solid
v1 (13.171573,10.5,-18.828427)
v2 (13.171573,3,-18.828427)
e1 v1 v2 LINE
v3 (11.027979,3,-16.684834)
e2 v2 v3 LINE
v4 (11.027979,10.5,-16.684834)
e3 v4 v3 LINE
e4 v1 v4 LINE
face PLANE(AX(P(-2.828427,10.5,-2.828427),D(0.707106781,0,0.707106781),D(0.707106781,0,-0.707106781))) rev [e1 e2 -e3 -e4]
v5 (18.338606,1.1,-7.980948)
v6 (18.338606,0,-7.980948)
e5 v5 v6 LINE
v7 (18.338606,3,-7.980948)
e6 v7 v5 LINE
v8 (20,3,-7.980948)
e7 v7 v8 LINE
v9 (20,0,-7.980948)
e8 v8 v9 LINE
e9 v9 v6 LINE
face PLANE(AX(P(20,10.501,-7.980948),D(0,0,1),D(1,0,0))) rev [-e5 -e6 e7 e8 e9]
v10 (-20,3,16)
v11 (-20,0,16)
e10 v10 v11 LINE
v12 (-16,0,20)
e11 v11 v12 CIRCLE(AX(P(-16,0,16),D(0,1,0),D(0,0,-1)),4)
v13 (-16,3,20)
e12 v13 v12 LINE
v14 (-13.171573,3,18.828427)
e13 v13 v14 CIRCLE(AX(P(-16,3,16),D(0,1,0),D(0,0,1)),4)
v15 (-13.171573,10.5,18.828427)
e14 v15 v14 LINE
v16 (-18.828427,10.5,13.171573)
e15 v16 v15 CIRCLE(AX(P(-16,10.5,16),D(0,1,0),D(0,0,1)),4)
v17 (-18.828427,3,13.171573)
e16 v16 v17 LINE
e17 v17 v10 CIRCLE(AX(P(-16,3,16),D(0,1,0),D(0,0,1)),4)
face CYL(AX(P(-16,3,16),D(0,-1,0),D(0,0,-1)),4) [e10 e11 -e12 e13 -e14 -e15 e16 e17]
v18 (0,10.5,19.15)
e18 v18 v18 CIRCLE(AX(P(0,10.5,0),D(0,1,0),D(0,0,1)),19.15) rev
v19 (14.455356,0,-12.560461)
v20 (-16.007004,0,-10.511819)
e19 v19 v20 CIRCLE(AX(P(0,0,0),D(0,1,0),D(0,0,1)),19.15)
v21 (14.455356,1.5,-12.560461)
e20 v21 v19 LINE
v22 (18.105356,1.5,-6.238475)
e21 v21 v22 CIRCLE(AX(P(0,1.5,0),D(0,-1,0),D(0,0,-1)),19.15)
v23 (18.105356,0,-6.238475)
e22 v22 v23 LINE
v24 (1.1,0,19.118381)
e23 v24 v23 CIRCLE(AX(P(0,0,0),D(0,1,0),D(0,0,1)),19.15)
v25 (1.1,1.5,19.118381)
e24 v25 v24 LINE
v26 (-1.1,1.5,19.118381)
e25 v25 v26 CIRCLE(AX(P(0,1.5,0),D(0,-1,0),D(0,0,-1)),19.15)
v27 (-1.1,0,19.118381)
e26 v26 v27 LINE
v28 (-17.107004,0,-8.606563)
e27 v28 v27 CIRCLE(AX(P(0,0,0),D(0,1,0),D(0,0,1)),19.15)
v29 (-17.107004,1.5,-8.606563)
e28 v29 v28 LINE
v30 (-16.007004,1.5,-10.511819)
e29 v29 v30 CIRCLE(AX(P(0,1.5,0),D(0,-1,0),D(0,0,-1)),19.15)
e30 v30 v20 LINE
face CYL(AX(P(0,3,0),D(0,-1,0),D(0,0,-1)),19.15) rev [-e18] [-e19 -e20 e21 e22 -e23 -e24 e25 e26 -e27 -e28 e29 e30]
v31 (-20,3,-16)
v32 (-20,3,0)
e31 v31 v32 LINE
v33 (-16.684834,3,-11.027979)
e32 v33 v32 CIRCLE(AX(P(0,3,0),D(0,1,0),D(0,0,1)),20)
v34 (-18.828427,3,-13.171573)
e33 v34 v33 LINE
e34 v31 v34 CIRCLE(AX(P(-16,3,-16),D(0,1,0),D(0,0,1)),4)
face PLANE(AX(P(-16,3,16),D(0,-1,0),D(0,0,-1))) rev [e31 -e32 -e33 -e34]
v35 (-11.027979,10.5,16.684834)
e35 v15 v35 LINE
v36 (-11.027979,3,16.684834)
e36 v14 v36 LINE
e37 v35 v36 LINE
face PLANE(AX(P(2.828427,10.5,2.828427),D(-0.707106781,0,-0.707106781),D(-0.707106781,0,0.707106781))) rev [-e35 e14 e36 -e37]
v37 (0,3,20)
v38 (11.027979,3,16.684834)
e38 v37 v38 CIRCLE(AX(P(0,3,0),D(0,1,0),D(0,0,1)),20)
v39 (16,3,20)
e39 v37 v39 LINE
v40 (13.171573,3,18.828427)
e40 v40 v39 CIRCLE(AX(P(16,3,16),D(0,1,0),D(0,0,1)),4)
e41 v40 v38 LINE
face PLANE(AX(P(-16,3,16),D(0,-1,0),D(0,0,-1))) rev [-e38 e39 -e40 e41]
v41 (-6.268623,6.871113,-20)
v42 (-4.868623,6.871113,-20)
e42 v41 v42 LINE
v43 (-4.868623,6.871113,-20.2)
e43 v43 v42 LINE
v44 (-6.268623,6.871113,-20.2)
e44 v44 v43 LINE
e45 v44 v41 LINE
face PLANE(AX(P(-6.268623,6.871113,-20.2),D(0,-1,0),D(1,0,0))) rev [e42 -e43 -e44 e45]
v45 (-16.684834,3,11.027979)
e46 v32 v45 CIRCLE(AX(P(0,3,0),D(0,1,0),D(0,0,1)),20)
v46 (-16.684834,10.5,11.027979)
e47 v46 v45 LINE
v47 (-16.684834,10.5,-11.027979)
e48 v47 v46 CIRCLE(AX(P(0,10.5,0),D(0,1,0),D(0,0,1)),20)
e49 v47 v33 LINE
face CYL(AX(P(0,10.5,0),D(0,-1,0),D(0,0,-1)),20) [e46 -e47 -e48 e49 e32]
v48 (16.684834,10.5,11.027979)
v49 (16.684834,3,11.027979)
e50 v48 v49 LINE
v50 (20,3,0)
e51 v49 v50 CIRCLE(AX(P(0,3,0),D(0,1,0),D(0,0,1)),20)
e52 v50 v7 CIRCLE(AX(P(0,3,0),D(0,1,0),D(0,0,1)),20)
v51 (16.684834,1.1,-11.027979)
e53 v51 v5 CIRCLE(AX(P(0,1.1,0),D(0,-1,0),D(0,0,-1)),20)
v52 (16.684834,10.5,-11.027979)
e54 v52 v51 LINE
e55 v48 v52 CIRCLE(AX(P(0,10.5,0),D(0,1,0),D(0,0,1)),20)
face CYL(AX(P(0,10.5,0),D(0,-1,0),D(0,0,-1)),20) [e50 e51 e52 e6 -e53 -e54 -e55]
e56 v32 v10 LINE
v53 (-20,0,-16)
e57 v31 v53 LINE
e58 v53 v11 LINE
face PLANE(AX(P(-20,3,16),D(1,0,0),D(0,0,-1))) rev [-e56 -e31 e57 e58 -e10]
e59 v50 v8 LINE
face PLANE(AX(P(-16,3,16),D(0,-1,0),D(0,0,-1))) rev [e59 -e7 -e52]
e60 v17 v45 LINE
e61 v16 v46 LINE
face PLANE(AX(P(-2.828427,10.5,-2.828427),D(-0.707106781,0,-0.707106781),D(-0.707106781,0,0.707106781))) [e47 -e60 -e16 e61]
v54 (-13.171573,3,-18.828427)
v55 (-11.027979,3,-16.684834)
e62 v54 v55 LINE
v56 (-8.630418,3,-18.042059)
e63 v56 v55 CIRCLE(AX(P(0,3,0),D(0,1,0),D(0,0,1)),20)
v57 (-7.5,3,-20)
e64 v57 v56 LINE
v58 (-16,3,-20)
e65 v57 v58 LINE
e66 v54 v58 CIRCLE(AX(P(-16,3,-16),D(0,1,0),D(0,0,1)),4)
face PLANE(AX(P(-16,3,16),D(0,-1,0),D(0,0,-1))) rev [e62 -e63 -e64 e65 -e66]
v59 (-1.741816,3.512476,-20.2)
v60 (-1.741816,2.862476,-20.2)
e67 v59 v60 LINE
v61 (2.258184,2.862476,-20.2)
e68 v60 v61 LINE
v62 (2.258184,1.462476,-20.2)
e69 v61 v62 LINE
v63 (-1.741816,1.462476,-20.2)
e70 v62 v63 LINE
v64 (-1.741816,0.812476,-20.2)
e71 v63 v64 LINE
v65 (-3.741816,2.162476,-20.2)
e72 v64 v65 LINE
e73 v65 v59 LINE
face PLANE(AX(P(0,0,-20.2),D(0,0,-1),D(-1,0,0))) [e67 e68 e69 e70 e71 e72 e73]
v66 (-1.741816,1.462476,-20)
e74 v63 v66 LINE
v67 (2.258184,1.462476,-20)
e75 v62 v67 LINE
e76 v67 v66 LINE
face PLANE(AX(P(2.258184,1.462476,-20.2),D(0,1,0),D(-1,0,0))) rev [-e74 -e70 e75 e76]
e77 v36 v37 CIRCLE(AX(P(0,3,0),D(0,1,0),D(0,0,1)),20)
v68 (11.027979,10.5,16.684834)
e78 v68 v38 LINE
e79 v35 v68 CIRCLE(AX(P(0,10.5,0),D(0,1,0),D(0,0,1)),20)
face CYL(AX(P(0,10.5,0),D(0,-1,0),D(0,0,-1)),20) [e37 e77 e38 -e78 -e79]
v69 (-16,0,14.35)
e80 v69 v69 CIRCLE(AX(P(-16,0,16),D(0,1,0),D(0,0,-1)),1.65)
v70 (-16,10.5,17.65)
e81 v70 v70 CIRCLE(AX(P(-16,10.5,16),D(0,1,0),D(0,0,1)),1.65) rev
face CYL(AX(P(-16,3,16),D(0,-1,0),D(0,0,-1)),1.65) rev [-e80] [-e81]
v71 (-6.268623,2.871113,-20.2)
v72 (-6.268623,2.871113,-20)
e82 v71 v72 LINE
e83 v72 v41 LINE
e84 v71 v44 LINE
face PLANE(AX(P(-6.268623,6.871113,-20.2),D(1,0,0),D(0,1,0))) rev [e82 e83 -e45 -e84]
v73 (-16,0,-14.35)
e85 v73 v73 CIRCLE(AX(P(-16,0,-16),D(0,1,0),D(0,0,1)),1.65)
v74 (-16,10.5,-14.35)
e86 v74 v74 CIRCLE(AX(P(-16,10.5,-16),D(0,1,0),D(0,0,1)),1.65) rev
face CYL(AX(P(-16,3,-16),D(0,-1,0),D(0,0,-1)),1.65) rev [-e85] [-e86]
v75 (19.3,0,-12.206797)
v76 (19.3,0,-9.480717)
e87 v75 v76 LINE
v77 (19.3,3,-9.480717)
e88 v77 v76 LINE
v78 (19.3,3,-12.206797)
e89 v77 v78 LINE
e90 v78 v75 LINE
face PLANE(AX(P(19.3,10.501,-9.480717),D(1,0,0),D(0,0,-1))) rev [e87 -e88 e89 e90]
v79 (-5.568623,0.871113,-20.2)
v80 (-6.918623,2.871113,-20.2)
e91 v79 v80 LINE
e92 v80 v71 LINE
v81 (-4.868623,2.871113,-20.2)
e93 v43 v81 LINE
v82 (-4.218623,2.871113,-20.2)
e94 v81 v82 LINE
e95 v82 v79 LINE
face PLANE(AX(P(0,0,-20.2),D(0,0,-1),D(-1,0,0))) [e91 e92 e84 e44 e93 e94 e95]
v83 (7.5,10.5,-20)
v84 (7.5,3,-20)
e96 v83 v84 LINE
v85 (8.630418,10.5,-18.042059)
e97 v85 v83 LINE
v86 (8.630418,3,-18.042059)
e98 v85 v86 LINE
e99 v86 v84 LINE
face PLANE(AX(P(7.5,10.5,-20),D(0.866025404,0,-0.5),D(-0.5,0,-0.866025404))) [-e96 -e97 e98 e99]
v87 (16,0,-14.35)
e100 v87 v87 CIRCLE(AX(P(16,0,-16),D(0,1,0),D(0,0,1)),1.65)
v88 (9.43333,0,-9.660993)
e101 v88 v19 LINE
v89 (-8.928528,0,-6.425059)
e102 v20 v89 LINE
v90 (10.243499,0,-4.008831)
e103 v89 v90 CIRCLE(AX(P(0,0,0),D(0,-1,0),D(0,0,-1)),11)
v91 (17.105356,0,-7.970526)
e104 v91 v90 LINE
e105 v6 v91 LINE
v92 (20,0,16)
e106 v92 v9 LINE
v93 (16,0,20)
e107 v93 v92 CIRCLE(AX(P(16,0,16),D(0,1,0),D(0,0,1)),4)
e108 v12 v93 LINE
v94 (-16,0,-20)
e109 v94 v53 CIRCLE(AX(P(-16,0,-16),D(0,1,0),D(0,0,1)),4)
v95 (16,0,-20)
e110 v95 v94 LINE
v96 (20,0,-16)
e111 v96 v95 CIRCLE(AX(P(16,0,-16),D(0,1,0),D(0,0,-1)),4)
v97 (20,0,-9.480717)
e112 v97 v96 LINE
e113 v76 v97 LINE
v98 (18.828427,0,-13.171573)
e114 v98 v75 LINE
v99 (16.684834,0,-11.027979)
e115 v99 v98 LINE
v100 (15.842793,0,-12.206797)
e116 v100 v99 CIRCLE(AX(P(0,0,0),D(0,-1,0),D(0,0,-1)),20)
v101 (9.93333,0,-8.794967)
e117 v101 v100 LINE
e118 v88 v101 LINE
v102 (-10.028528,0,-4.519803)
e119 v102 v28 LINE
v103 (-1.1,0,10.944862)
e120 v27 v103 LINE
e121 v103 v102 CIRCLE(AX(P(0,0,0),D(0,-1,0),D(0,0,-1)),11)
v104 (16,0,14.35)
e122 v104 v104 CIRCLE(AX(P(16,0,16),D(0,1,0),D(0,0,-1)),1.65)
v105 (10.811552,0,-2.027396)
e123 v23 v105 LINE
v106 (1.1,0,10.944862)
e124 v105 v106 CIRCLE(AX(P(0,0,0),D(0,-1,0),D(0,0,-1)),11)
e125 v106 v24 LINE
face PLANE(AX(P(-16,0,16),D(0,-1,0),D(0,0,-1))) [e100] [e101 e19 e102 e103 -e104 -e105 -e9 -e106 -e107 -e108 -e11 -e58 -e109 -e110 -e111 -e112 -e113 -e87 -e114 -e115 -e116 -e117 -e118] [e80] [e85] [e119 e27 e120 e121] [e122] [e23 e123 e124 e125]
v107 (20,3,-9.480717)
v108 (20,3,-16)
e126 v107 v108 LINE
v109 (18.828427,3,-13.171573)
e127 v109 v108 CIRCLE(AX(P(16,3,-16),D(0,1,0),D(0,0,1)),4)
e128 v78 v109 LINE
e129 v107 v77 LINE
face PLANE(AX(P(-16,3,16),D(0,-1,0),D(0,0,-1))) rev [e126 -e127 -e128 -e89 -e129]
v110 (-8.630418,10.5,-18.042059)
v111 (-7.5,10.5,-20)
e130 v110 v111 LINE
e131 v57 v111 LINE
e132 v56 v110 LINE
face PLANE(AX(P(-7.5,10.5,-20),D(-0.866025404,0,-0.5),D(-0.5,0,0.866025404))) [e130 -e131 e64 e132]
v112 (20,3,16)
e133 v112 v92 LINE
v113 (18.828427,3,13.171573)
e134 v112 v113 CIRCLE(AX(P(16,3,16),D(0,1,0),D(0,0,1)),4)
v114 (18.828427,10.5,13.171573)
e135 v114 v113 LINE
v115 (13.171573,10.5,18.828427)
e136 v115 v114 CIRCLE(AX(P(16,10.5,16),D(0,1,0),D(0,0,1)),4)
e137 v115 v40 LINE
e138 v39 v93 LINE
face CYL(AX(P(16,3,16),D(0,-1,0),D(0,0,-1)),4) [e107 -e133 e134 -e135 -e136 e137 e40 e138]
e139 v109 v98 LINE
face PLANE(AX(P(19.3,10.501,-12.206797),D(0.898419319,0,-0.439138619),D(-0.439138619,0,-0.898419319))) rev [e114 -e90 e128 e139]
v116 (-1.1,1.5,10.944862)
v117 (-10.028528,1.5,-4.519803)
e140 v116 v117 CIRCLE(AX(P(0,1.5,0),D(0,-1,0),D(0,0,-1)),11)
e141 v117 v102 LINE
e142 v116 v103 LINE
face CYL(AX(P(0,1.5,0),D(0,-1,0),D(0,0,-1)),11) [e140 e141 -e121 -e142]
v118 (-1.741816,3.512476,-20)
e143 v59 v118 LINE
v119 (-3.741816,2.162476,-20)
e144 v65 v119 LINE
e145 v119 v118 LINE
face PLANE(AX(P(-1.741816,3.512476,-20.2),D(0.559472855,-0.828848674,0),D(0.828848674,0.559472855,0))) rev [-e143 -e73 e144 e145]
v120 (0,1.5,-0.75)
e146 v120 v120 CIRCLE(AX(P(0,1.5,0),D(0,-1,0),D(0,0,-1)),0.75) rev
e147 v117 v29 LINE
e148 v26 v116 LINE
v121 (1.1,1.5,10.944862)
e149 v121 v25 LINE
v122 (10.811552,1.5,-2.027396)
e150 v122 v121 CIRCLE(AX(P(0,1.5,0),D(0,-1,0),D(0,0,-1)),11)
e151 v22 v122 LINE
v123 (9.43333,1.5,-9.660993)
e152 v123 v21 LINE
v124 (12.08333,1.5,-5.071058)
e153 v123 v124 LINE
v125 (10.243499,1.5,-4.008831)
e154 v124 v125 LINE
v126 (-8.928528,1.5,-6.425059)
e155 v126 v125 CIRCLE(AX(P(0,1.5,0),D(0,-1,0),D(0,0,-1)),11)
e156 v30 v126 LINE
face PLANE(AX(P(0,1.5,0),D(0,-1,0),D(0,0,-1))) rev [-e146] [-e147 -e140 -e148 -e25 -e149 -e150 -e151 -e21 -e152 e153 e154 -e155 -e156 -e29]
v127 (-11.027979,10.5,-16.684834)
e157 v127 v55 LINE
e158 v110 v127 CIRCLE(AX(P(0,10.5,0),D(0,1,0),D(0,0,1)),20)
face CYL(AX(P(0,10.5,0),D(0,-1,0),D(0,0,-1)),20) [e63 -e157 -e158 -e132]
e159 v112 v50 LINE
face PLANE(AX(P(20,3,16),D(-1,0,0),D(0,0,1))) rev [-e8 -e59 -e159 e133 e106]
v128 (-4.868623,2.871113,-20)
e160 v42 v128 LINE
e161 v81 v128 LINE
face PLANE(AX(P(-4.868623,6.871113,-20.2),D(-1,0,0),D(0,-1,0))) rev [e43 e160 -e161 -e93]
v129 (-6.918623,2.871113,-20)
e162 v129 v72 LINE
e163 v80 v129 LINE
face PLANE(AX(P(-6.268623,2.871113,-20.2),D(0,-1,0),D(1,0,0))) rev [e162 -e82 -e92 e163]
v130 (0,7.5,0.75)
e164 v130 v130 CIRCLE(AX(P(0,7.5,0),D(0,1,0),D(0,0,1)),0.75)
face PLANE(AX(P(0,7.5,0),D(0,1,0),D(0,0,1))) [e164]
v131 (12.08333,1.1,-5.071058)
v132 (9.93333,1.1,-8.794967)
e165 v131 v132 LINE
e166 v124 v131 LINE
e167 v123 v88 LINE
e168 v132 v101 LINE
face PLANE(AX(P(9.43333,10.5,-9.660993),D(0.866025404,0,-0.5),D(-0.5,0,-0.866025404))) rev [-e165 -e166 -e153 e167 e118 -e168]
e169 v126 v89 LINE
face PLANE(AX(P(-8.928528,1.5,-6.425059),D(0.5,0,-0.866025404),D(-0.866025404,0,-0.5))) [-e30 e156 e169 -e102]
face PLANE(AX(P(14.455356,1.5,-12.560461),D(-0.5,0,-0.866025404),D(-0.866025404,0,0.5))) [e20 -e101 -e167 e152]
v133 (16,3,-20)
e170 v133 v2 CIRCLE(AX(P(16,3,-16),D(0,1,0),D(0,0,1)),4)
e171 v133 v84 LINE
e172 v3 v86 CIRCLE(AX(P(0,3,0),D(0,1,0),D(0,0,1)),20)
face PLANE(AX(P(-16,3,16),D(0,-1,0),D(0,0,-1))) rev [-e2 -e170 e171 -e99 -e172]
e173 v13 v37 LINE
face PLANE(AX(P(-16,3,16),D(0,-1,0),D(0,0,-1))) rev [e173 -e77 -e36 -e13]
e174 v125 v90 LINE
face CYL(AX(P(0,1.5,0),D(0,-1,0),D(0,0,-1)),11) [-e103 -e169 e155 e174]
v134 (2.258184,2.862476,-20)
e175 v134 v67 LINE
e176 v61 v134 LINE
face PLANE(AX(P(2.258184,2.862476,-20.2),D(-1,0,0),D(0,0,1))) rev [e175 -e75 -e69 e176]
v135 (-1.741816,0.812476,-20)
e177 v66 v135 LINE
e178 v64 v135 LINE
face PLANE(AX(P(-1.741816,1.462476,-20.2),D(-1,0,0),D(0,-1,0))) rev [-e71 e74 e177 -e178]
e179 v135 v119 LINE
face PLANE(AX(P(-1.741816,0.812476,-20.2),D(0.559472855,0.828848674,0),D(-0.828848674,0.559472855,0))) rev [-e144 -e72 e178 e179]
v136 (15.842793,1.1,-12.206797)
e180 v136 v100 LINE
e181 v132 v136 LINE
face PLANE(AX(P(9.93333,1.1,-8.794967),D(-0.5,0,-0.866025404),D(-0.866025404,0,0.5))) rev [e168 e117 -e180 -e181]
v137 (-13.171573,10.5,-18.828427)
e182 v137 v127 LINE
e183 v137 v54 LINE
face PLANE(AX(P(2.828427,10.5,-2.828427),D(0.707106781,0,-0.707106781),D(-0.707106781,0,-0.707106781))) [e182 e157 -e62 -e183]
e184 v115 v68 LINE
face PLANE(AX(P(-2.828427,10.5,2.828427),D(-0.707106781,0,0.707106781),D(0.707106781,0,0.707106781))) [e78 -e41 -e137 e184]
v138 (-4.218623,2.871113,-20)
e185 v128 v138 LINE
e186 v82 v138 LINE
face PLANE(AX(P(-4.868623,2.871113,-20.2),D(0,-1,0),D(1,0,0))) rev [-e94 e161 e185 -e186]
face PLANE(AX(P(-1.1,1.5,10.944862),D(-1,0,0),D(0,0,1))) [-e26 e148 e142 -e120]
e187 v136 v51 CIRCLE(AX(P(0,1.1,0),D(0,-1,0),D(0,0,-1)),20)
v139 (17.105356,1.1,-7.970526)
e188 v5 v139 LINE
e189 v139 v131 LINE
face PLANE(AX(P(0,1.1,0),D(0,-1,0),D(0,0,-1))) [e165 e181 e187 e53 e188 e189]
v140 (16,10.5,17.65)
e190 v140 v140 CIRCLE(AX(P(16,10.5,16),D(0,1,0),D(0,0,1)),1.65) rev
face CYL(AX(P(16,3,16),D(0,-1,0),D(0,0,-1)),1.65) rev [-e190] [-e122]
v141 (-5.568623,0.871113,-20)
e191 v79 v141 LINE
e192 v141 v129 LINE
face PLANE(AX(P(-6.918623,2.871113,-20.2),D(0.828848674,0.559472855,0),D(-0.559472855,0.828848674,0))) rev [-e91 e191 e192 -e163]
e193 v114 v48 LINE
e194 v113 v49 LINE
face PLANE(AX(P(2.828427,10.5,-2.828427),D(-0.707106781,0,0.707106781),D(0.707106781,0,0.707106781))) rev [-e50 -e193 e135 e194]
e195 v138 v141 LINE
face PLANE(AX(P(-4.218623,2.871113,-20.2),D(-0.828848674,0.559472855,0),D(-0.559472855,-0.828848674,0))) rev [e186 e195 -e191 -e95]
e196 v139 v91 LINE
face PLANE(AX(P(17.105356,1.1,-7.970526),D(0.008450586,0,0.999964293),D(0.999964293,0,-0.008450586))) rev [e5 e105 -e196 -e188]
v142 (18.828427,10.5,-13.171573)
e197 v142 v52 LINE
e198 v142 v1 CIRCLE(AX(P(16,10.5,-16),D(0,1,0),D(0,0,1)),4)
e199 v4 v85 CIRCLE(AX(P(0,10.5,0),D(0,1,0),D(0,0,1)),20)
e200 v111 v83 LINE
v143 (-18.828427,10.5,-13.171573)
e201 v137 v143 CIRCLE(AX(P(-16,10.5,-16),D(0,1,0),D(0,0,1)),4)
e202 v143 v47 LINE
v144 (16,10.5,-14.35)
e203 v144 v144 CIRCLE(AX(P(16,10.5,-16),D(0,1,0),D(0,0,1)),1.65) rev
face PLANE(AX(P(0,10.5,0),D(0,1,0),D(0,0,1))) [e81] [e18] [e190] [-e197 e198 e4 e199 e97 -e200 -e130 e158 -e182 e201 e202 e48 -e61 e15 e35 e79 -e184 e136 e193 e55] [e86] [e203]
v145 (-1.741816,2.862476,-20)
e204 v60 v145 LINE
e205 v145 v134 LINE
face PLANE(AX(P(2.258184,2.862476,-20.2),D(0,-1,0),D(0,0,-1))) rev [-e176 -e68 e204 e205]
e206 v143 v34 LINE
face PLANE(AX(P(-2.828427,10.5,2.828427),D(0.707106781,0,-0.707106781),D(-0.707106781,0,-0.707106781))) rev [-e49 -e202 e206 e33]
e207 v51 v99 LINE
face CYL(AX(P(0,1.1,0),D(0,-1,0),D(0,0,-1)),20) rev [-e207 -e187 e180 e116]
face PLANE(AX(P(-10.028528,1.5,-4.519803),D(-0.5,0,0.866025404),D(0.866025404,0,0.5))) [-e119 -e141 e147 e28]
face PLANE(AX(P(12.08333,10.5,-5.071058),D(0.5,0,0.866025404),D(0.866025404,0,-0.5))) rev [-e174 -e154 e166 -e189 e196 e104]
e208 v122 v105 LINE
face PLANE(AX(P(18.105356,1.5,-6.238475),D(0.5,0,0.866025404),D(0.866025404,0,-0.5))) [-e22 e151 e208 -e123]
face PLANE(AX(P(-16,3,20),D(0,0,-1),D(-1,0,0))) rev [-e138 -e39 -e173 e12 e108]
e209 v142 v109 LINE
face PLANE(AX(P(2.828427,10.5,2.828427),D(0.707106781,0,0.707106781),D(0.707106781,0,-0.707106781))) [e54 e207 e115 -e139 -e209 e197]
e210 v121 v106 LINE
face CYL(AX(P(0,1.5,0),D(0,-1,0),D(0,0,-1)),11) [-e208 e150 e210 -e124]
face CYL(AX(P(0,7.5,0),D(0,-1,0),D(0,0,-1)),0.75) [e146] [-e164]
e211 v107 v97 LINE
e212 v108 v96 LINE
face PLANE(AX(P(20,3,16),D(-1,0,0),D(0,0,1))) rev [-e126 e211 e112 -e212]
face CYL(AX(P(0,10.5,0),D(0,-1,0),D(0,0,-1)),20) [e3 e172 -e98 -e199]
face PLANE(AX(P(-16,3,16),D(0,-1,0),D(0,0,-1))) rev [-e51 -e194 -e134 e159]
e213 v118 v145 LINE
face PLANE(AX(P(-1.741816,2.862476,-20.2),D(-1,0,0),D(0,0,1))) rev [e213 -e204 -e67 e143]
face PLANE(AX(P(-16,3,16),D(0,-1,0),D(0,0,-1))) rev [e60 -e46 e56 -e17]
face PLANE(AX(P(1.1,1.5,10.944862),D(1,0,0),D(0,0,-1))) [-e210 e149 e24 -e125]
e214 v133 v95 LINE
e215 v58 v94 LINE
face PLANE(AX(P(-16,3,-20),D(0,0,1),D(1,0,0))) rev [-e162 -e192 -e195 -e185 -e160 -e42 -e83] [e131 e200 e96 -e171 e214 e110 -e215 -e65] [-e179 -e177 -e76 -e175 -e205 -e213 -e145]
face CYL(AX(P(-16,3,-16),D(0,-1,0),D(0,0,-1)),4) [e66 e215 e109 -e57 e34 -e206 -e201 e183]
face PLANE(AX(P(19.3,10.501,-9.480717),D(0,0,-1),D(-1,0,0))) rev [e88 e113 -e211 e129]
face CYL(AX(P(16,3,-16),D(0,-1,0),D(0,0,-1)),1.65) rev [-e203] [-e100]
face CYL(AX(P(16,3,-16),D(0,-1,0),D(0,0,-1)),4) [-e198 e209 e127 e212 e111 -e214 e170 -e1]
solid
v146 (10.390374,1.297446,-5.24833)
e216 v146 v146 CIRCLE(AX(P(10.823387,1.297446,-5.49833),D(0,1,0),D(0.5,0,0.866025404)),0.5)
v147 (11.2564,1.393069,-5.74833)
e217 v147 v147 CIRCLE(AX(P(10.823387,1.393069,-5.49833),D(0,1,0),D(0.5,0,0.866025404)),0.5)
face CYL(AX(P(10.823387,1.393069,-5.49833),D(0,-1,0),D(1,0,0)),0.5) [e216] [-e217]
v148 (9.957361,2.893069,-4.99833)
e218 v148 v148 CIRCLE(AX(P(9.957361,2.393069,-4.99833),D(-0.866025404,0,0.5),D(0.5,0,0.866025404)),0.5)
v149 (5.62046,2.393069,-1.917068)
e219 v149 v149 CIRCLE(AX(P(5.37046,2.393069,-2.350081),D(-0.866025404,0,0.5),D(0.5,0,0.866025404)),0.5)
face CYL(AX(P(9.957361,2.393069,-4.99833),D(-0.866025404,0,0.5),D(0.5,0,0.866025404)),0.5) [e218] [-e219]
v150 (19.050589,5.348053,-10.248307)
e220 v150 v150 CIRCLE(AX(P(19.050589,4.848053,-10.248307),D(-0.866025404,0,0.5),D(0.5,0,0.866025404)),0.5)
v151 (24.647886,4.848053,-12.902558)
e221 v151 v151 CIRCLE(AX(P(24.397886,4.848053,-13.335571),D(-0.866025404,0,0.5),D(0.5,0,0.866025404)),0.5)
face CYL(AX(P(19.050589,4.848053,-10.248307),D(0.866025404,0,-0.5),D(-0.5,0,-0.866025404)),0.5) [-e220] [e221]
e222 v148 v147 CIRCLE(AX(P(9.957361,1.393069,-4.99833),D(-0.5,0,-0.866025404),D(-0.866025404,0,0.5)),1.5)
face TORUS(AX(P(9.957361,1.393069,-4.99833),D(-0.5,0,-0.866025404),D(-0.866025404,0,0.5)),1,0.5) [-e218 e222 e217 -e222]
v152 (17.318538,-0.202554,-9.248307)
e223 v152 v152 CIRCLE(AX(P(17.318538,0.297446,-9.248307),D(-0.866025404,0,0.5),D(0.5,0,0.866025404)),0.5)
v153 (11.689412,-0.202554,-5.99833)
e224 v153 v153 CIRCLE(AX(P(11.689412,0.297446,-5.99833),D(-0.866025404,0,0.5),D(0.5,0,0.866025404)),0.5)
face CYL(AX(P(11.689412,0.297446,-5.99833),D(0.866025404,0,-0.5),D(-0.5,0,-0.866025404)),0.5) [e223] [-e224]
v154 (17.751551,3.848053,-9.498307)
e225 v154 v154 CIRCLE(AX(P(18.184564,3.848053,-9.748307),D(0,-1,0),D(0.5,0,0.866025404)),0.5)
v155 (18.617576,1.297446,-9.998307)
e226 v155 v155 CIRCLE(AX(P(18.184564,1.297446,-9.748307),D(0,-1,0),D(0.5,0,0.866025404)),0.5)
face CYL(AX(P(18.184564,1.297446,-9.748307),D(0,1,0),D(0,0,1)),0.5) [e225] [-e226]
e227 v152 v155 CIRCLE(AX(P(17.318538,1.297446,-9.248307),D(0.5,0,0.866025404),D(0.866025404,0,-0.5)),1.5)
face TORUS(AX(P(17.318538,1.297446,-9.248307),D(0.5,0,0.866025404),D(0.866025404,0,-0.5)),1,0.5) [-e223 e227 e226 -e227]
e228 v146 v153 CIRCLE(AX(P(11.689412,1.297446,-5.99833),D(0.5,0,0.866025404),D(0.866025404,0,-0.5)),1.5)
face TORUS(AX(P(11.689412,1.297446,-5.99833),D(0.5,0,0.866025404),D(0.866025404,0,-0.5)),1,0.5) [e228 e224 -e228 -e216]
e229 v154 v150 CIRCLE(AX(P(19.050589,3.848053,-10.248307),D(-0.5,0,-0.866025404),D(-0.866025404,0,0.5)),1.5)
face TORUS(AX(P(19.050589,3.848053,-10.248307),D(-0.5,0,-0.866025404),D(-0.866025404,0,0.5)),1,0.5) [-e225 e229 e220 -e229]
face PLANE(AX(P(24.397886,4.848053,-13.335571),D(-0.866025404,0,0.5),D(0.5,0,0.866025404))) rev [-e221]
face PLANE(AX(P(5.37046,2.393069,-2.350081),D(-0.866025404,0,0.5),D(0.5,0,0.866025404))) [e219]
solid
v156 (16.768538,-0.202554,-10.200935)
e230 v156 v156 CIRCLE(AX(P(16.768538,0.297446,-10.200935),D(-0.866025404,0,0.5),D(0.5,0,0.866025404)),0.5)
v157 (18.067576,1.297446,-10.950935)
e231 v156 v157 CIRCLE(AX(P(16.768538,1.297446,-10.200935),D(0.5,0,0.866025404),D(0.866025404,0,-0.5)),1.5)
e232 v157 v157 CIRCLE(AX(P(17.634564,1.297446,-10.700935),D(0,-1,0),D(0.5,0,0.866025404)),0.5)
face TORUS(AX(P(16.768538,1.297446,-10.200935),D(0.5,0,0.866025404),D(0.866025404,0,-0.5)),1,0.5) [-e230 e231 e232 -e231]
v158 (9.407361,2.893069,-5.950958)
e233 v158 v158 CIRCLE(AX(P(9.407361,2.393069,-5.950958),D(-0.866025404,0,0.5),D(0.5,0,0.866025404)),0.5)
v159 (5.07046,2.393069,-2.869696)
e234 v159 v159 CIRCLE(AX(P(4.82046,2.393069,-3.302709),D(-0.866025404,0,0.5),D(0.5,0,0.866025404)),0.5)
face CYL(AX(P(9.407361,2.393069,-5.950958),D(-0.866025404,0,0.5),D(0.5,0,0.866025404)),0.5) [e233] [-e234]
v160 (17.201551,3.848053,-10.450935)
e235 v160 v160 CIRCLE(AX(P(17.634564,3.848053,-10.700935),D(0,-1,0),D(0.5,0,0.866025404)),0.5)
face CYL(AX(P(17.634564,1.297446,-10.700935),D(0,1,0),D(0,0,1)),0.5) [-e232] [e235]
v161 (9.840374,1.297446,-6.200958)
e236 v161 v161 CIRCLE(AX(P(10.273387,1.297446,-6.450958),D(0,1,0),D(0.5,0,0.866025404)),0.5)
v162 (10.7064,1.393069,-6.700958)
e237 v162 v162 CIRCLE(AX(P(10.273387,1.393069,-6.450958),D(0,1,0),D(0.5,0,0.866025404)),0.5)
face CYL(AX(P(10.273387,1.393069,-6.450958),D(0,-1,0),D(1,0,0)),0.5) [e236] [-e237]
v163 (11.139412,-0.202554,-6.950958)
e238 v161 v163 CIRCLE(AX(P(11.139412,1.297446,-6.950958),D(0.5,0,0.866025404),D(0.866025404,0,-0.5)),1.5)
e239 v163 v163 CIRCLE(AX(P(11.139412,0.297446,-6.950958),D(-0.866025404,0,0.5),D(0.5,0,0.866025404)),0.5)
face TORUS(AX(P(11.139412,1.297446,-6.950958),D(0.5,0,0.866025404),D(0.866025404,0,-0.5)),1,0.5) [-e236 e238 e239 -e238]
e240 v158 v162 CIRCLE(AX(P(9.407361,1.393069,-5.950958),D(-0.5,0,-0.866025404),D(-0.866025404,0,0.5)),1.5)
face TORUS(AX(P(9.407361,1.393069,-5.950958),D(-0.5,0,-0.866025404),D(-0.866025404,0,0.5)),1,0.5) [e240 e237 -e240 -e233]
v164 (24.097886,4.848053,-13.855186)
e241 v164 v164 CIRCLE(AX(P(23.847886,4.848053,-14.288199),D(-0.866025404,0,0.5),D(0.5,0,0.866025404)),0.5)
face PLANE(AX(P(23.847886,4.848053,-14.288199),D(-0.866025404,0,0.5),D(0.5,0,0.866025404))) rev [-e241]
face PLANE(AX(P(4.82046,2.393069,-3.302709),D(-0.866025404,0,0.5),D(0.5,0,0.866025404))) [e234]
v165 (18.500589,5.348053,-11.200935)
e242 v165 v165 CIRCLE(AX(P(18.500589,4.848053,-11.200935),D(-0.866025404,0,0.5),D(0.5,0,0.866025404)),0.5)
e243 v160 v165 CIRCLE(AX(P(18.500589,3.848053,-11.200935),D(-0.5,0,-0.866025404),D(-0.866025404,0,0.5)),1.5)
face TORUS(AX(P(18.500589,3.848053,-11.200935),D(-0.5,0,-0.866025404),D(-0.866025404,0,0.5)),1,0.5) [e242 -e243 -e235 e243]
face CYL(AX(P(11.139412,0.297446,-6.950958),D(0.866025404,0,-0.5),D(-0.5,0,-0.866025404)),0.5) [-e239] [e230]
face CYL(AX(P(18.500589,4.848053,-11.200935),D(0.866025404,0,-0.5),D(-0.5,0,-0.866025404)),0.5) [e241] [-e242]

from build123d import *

# Parameters (mm, degrees)
SKETCH1_R           = 1.65
SKETCH1_R_2         = 19.15
BOSS_EXTRUDE1_DEPTH = 3
SKETCH2_R           = 1.65
SKETCH2_R_2         = 19.15
BOSS_EXTRUDE2_DEPTH = 7.5
BOSS_EXTRUDE3_DEPTH = 1.5
CUT_EXTRUDE1_DEPTH  = 31.170349683
CUT_EXTRUDE2_DEPTH  = 1.1
CUT_EXTRUDE3_REACH  = 32.17
SKETCH7_R           = 0.75
BOSS_EXTRUDE4_DEPTH = 6
BOSS_EXTRUDE5_START = 3
BOSS_EXTRUDE5_DEPTH = 7.5
DRAFT1_ANGLE        = 30
BOSS_EXTRUDE6_DEPTH = 0.2
SKETCH13_R          = 0.5


# Read off the part's stored shape, not the designer's step: Boss-Extrude5
with BuildPart() as part:
    # Sketch1 → Boss-Extrude1 (new body)
    with BuildSketch(Plane(origin=(0, 0, 0), x_dir=(1, 0, 0), z_dir=(0, 1, 0))):
        with BuildLine():
            Line((-16, -20), (16, -20))
            ThreePointArc((16, -20), (18.828427125, -18.828427125), (20, -16))
            Line((20, -16), (20, 16))
            ThreePointArc((20, 16), (18.828427125, 18.828427125), (16, 20))
            Line((16, 20), (-16, 20))
            ThreePointArc((-16, 20), (-18.828427125, 18.828427125), (-20, 16))
            Line((-20, 16), (-20, -16))
            ThreePointArc((-20, -16), (-18.828427125, -18.828427125), (-16, -20))
        make_face()
        with Locations(Location((-16, 16, 0), (0, 0, 270))):
            Circle(SKETCH1_R, mode=Mode.SUBTRACT)
        with Locations(Location((16, 16, 0), (0, 0, 270))):
            Circle(SKETCH1_R, mode=Mode.SUBTRACT)
        with Locations(Location((-16, -16, 0), (0, 0, 90))):
            Circle(SKETCH1_R, mode=Mode.SUBTRACT)
        with Locations(Location((16, -16, 0), (0, 0, 90))):
            Circle(SKETCH1_R, mode=Mode.SUBTRACT)
        with Locations(Location((0, 0, 0), (0, 0, 270))):
            Circle(SKETCH1_R_2, mode=Mode.SUBTRACT)
    extrude(amount=BOSS_EXTRUDE1_DEPTH)

    # Sketch2 → Boss-Extrude2 (add)
    with BuildSketch(Plane(origin=(0, 3, 0), x_dir=(1, 0, 0), z_dir=(0, 1, 0))):
        with BuildLine():
            Line((-13.171572875, -18.828427125), (-11.027979336, -16.684833585))
            ThreePointArc((-11.027979336, -16.684833585), (0, -20), (11.027979336, -16.684833585))
            Line((11.027979336, -16.684833585), (13.171572875, -18.828427125))
            ThreePointArc((13.171572875, -18.828427125), (18.828427125, -18.828427125), (18.828427125, -13.171572875))
            Line((18.828427125, -13.171572875), (16.684833585, -11.027979336))
            ThreePointArc((16.684833585, -11.027979336), (20, 0), (16.684833585, 11.027979336))
            Line((16.684833585, 11.027979336), (18.828427125, 13.171572875))
            ThreePointArc((18.828427125, 13.171572875), (18.828427125, 18.828427125), (13.171572875, 18.828427125))
            Line((13.171572875, 18.828427125), (11.027979336, 16.684833585))
            ThreePointArc((11.027979336, 16.684833585), (0, 20), (-11.027979336, 16.684833585))
            Line((-11.027979336, 16.684833585), (-13.171572875, 18.828427125))
            ThreePointArc((-13.171572875, 18.828427125), (-18.828427125, 18.828427125), (-18.828427125, 13.171572875))
            Line((-18.828427125, 13.171572875), (-16.684833585, 11.027979336))
            ThreePointArc((-16.684833585, 11.027979336), (-20, 0), (-16.684833585, -11.027979336))
            Line((-16.684833585, -11.027979336), (-18.828427125, -13.171572875))
            ThreePointArc((-18.828427125, -13.171572875), (-18.828427125, -18.828427125), (-13.171572875, -18.828427125))
        make_face()
        with Locations(Location((-16, -16, 0), (0, 0, 90))):
            Circle(SKETCH2_R, mode=Mode.SUBTRACT)
        with Locations(Location((0, 0, 0), (0, 0, 270))):
            Circle(SKETCH2_R_2, mode=Mode.SUBTRACT)
        with Locations(Location((16, -16, 0), (0, 0, 90))):
            Circle(SKETCH2_R, mode=Mode.SUBTRACT)
        with Locations(Location((-16, 16, 0), (0, 0, 270))):
            Circle(SKETCH2_R, mode=Mode.SUBTRACT)
        with Locations(Location((16, 16, 0), (0, 0, 270))):
            Circle(SKETCH2_R, mode=Mode.SUBTRACT)
    extrude(amount=BOSS_EXTRUDE2_DEPTH)

    # Sketch3 → Boss-Extrude3 (add)
    with BuildSketch(Plane.XZ):
        with BuildLine():
            Line((1.1, 10.944861808), (1.1, 19.118381208))
            ThreePointArc((1.1, 19.118381208), (0, 19.15), (-1.1, 19.118381208))
            Line((-1.1, 19.118381208), (-1.1, 10.944861808))
            ThreePointArc((-1.1, 10.944861808), (-9.526279442, 5.5), (-10.028528367, -4.51980296))
            Line((-10.028528367, -4.51980296), (-17.107003805, -8.60656266))
            ThreePointArc((-17.107003805, -8.60656266), (-16.584386482, -9.575), (-16.007003805, -10.511818548))
            Line((-16.007003805, -10.511818548), (-8.928528367, -6.425058848))
            ThreePointArc((-8.928528367, -6.425058848), (-1.306256139, -10.922165303), (7.161552454, -8.349381202))
            Line((7.161552454, -8.349381202), (14.455356261, -12.560460794))
            ThreePointArc((14.455356261, -12.560460794), (16.584386482, -9.575), (18.105356261, -6.238475346))
            Line((18.105356261, -6.238475346), (10.811552454, -2.027395754))
            ThreePointArc((10.811552454, -2.027395754), (8.805744547, 6.592333651), (1.1, 10.944861808))
        make_face()
    extrude(amount=-BOSS_EXTRUDE3_DEPTH)

    # Sketch4 → Cut-Extrude1 (cut, through all)
    with BuildSketch(Plane.XZ):
        with BuildLine():
            Line((7.161552454, -8.349381202), (9.433330249, -9.660992724))
            Line((9.433330249, -9.660992724), (12.083330249, -5.071058084))
            Line((12.083330249, -5.071058084), (10.243499084, -4.008831065))
            ThreePointArc((10.243499084, -4.008831065), (8.969060633, -6.368355468), (7.161552454, -8.349381202))
        make_face()
    extrude(amount=-CUT_EXTRUDE1_DEPTH, mode=Mode.SUBTRACT)

    # Sketch5 → Cut-Extrude2 (cut)
    with BuildSketch(Plane.XZ):
        with BuildLine():
            Line((9.933330249, -8.79496732), (12.083330249, -5.071058084))
            Line((12.083330249, -5.071058084), (17.105356261, -7.970526154))
            Line((17.105356261, -7.970526154), (18.338605882, -7.980948208))
            ThreePointArc((18.338605882, -7.980948208), (17.220814787, -10.170719645), (15.842793248, -12.206797373))
            Line((15.842793248, -12.206797373), (9.933330249, -8.79496732))
        make_face()
    extrude(amount=-CUT_EXTRUDE2_DEPTH, mode=Mode.SUBTRACT)

    # Sketch6 → Cut-Extrude3 (cut, up to next)
    with BuildSketch(Plane.XZ, mode=Mode.PRIVATE) as cut_extrude3_sk1:
        with BuildLine():
            Line((18.828427125, -13.171572875), (16.684833585, -11.027979336))
            ThreePointArc((16.684833585, -11.027979336), (17.577867553, -9.540365417), (18.338605882, -7.980948208))
            Line((18.338605882, -7.980948208), (20, -7.980948208))
            Line((20, -7.980948208), (20, -9.480717324))
            Line((20, -9.480717324), (19.3, -9.480717324))
            Line((19.3, -9.480717324), (19.3, -12.206797373))
            Line((19.3, -12.206797373), (18.828427125, -13.171572875))
        make_face()
    cut_extrude3_tool1 = extrude(cut_extrude3_sk1.sketch, amount=-CUT_EXTRUDE3_REACH, mode=Mode.PRIVATE) & part.part
    add(cut_extrude3_tool1.solids().sort_by_distance((18.505479, 0, -10.298583))[0], mode=Mode.SUBTRACT)

    # Sketch7 → Boss-Extrude4 (add)
    with BuildSketch(Plane(origin=(0, 1.5, 0), x_dir=(1, 0, 0), z_dir=(0, 1, 0))):
        with Locations(Location((0, 0, 0), (0, 0, 90))):
            Circle(SKETCH7_R)
    extrude(amount=BOSS_EXTRUDE4_DEPTH)

    # Boss-Extrude5 outline → Boss-Extrude5 (add)
    with BuildSketch(Plane(origin=(0, 0, 0), x_dir=(1, 0, 0), z_dir=(0, 1, 0)).offset(BOSS_EXTRUDE5_START)):
        with BuildLine():
            Line((7.5, 20), (3.8e-08, 20))
            ThreePointArc((3.8e-08, 20), (3.820345268, 19.631733546), (7.5, 18.540496218))
            Line((7.5, 18.540496218), (7.5, 20))
        make_face()
        with BuildLine():
            Line((3.8e-08, 20), (-7.5, 20))
            Line((-7.5, 20), (-7.5, 18.540496218))
            ThreePointArc((-7.5, 18.540496218), (-3.820345231, 19.631733554), (3.8e-08, 20))
        make_face()
    extrude(amount=BOSS_EXTRUDE5_DEPTH)

    # Draft1
    draft1_faces = [part.faces().sort_by_distance(p)[0] for p in [
        (-7.5, 6.75, -19.270248109),
        (7.5, 6.75, -19.270248109),
    ]]
    draft(draft1_faces, Plane(origin=(-16, 3, -20), x_dir=(-1, 0, 0), z_dir=(0, 0, -1)), DRAFT1_ANGLE)

    # Sketch10 → Boss-Extrude6 (add)
    with BuildSketch(Plane(origin=(0, 0, -20), x_dir=(-1, 0, 0), z_dir=(0, 0, -1))):
        Polygon((-2.258183583, 2.862476447), (1.741816417, 2.862476447), (1.741816417, 3.512476447), (3.741816417, 2.162476447), (1.741816417, 0.812476447), (1.741816417, 1.462476447), (-2.258183583, 1.462476447), align=None)
        Polygon((4.868622576, 6.871113473), (4.868622576, 2.871113473), (4.218622576, 2.871113473), (5.568622576, 0.871113473), (6.918622576, 2.871113473), (6.268622576, 2.871113473), (6.268622576, 6.871113473), align=None)
    extrude(amount=BOSS_EXTRUDE6_DEPTH)


with BuildPart() as body_2:
    # Sweep4: sweep along a path in Sketch12
    with BuildLine(Plane(origin=(0.325, 0, 0.562916512), x_dir=(-0.8660254037844383, 0, 0.5000000000000009), z_dir=(-0.5000000000000008, 0, -0.8660254037844382))) as sweep4_path:
        Line((-27.796974616, 4.848053251), (-21.622447811, 4.848053251))
        ThreePointArc((-21.622447811, 4.848053251), (-20.91534103, 4.555160032), (-20.622447811, 3.848053251))
        Line((-20.622447811, 3.848053251), (-20.622447811, 1.297445707))
        ThreePointArc((-20.622447811, 1.297445707), (-20.329554592, 0.590338926), (-19.622447811, 0.297445707))
        Line((-19.622447811, 0.297445707), (-13.122492971, 0.297445707))
        ThreePointArc((-13.122492971, 0.297445707), (-12.41538619, 0.590338926), (-12.122492971, 1.297445707))
        Line((-12.122492971, 1.297445707), (-12.122492971, 1.393069256))
        ThreePointArc((-12.122492971, 1.393069256), (-11.829599752, 2.100176037), (-11.122492971, 2.393069256))
        Line((-11.122492971, 2.393069256), (-5.825995326, 2.393069256))
    # Sketch13 → Sweep4 (sweep)
    with BuildSketch(Plane(origin=(5.045459955, 0, -2.912997663), x_dir=(0.4999999999999999, 0, 0.8660254037844387), z_dir=(-0.8660254037844388, 0, 0.49999999999999994))):
        with Locations((0.65, 2.393069256)):
            Circle(SKETCH13_R)
        with Locations((-0.45, 2.393069256)):
            Circle(SKETCH13_R)
    sweep(path=sweep4_path.line)


solid = Compound([part.part, body_2.part])
